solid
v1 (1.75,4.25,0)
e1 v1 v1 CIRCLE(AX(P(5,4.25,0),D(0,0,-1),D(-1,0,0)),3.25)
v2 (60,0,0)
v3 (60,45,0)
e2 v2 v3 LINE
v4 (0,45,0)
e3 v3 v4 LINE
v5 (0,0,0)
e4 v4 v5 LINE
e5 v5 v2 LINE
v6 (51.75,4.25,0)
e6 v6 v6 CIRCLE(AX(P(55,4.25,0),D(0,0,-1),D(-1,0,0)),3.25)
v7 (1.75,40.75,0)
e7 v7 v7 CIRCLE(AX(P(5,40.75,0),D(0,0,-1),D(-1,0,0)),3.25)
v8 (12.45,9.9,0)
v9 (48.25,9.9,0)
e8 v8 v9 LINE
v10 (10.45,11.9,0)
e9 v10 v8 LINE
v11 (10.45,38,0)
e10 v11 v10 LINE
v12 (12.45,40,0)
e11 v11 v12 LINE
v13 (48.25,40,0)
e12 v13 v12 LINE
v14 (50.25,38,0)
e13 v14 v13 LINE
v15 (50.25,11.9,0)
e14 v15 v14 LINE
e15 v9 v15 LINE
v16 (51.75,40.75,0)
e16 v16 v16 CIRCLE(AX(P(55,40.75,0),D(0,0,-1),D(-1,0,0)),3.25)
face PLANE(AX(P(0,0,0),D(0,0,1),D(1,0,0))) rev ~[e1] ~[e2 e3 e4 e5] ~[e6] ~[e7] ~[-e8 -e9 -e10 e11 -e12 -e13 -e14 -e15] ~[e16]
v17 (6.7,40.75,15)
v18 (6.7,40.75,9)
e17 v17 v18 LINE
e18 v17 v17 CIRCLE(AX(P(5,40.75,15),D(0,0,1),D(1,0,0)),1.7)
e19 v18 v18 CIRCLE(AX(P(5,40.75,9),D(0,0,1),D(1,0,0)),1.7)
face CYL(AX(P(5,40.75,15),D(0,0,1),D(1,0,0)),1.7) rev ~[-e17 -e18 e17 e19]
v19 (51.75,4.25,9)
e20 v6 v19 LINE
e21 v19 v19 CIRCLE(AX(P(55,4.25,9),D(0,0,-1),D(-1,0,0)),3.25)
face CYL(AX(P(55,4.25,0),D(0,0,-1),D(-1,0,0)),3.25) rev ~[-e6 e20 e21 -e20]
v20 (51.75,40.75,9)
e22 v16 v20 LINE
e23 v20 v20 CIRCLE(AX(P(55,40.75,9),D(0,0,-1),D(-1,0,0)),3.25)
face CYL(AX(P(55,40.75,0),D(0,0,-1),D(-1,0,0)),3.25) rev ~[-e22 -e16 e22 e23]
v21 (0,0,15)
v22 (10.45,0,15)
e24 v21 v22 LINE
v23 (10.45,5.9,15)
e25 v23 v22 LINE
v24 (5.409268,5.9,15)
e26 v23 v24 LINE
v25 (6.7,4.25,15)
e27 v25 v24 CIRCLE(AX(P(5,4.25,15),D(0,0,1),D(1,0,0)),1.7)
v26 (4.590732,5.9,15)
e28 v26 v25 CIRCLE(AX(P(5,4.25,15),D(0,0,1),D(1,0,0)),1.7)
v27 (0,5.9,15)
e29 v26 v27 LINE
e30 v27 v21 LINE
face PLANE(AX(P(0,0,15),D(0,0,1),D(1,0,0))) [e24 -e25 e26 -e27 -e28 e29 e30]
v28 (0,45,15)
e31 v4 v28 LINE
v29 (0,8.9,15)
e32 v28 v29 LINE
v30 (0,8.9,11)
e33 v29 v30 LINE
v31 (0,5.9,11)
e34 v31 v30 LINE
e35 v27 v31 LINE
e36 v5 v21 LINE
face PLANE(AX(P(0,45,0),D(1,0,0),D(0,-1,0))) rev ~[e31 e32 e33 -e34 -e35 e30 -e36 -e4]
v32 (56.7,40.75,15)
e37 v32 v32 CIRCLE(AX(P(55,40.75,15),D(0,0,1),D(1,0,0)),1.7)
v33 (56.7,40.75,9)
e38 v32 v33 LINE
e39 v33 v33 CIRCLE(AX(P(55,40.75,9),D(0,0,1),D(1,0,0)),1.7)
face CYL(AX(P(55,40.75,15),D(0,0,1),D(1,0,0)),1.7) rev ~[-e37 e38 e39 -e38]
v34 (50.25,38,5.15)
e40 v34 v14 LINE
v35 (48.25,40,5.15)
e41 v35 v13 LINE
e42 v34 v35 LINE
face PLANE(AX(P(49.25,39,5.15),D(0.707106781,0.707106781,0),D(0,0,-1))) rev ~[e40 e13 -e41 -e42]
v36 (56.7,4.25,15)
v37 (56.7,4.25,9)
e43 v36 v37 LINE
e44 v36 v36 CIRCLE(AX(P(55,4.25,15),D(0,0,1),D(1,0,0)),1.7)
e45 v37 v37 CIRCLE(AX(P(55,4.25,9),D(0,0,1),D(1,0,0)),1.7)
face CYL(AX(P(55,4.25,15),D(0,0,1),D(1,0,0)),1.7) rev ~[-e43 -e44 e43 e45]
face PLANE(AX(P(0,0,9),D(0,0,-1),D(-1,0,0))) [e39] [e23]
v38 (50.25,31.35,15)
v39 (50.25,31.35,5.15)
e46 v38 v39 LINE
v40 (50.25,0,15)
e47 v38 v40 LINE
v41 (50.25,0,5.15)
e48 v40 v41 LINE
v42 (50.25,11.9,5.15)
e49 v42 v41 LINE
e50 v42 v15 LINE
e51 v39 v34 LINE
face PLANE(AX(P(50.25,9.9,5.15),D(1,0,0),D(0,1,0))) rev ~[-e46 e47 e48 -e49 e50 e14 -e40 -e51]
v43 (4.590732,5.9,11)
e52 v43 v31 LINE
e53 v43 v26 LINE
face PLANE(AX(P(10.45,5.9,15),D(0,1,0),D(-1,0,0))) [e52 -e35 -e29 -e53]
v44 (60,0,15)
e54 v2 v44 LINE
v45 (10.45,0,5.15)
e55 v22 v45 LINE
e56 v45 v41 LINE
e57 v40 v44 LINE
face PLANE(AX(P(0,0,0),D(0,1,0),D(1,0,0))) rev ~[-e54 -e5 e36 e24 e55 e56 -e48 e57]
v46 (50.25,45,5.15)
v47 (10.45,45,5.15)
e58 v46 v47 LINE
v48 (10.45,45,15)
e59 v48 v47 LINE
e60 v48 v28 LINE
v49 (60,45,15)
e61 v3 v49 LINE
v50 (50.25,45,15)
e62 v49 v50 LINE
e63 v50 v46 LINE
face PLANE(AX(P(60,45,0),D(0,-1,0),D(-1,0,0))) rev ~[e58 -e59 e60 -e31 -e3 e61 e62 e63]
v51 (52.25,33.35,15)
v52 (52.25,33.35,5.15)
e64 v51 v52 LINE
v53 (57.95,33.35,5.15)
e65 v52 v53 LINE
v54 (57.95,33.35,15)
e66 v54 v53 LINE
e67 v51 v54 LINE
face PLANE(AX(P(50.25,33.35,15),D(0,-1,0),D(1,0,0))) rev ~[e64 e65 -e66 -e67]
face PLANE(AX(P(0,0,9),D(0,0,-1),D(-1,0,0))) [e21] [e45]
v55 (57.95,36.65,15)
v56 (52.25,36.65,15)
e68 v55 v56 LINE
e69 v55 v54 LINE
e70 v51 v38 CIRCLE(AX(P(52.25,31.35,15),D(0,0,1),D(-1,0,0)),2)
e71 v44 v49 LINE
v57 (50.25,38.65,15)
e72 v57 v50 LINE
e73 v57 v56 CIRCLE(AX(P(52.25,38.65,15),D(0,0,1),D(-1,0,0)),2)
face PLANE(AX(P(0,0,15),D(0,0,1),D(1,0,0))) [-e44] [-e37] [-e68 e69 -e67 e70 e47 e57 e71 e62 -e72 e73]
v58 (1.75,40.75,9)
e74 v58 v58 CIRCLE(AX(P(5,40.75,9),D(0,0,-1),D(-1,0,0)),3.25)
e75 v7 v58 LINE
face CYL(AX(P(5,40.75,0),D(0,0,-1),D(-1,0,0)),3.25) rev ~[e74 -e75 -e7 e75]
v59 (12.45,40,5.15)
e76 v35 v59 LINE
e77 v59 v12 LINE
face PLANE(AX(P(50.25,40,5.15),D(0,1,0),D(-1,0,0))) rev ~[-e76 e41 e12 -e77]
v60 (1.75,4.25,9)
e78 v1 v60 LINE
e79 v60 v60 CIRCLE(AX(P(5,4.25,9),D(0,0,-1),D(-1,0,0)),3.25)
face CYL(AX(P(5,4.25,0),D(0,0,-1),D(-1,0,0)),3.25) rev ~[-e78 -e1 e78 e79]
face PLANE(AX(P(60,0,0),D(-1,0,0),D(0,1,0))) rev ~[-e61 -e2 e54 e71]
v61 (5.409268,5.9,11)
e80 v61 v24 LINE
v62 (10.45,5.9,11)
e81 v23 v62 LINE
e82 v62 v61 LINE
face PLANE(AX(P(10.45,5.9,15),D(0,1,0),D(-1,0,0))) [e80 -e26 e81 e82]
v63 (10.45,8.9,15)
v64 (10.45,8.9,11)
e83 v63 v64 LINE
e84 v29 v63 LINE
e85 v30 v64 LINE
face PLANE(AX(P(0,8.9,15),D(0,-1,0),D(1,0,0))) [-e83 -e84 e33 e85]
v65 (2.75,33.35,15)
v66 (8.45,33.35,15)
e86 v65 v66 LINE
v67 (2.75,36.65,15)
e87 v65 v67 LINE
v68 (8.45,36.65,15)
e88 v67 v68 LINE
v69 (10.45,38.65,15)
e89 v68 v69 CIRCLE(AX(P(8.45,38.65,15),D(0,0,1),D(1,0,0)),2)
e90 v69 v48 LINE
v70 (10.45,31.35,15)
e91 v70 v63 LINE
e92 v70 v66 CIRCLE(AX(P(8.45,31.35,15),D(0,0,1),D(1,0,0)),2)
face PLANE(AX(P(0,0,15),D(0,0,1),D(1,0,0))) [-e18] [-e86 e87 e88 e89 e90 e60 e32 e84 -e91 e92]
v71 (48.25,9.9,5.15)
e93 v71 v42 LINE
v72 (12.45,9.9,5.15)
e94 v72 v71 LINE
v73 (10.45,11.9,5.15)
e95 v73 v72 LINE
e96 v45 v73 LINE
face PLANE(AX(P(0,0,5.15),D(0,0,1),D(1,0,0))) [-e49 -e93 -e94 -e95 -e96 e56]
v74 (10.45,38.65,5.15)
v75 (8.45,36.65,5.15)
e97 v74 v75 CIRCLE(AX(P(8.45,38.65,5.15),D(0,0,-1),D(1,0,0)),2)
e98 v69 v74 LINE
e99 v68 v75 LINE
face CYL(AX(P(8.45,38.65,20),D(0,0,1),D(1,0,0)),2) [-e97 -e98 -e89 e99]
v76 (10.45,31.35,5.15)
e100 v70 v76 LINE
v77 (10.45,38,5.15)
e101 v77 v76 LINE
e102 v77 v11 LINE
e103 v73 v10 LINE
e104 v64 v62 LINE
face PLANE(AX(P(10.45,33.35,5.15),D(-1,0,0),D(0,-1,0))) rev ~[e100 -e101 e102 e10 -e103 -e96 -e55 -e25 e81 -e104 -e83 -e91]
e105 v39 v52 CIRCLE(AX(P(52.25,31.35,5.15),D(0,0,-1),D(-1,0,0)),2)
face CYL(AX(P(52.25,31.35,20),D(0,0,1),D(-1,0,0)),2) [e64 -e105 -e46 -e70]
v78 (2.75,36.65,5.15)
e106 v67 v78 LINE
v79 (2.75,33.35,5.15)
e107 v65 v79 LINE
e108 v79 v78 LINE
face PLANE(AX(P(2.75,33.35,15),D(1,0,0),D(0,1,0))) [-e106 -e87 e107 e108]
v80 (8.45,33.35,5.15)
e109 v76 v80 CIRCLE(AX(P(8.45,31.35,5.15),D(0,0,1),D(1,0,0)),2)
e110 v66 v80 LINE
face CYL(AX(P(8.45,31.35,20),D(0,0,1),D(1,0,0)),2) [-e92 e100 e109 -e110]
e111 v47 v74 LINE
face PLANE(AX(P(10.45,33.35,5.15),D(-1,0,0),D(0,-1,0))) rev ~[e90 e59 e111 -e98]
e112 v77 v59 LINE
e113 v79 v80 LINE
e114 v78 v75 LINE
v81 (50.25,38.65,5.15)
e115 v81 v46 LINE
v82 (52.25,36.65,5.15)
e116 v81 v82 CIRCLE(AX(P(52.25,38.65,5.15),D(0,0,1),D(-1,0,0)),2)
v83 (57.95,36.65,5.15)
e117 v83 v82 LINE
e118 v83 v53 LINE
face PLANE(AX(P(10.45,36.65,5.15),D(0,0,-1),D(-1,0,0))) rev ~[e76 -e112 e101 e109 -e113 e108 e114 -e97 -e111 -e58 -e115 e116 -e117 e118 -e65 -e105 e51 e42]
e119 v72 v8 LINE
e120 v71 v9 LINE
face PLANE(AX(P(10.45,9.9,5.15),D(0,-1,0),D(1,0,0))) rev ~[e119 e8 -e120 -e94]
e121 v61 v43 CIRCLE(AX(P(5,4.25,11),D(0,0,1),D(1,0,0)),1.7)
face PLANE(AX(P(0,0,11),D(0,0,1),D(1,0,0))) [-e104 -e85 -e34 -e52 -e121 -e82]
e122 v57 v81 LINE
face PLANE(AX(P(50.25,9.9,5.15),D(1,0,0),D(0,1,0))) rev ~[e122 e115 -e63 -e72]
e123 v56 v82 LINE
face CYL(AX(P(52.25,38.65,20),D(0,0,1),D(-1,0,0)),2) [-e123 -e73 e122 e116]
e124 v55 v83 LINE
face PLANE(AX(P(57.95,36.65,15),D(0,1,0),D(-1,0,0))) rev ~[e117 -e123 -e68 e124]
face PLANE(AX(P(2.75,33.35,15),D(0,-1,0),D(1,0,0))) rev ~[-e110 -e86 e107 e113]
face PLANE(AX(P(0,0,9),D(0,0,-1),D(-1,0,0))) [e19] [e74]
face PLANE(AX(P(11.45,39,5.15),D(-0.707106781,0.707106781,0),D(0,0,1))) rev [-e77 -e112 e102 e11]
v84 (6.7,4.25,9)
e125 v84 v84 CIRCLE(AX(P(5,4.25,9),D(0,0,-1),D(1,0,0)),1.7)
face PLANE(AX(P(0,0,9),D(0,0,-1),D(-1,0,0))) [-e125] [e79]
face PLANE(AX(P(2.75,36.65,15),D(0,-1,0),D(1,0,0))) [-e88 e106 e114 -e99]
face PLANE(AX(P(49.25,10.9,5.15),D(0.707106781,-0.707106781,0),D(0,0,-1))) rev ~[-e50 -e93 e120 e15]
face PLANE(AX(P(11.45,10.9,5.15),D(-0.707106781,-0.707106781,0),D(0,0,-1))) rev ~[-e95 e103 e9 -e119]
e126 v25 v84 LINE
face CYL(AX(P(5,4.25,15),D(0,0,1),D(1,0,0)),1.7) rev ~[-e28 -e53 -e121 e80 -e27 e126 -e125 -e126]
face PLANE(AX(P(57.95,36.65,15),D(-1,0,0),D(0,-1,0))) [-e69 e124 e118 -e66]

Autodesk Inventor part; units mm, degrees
ref_plane "YZ Plane" through (0, 0, 0) normal (1, 0, 0) x (0, 1, 0)
ref_plane "XZ Plane" through (0, 0, 0) normal (0, 1, 0) x (-1, 0, 0)
ref_plane "XY Plane" through (0, 0, 0) normal (0, 0, 1) x (1, 0, 0)
sketch "Sketch2" plane through (0, 0, 0) normal (0, 0, 1) x (1, 0, 0)
  line L0 (0, 0) -> (60, 0)
  line L1 (60, 0) -> (60, 45)
  line L2 (60, 45) -> (0, 45)
  line L3 (0, 45) -> (0, 0)
  dimension "d0" = 60
  dimension "d1" = 45
extrude "Cover_Body" add sketch "Sketch2" along normal blind 15
sketch "Sketch4" plane through (0, 0, 15) normal (0, 0, 1) x (1, 0, 0)
  line L0 (60, 45) -> (0, 45) projected
  line L1 (0, 45) -> (0, 0) projected
  line L2 (2.75, 33.35) -> (10.45, 33.35)
  line L3 (50.25, 33.35) -> (57.95, 33.35)
  line L4 (60, 0) -> (60, 45) projected
  line L5 (0, 0) -> (60, 0) projected
  line L6 (2.75, 33.35) -> (2.75, 36.65)
  line L7 (2.75, 36.65) -> (10.45, 36.65)
  line L8 (10.45, 36.65) -> (10.45, 45)
  line L9 (57.95, 36.65) -> (57.95, 33.35)
  line L10 (57.95, 36.65) -> (50.25, 36.65)
  line L11 (50.25, 36.65) -> (50.25, 45)
  line L12 (10.45, 45) -> (50.25, 45)
  line L13 (30, 36.5125) -> (30, -47.625) construction
  line L14 (50.25, 33.35) -> (50.25, 0)
  line L15 (10.45, 33.35) -> (10.45, 0)
  line L16 (10.45, 0) -> (50.25, 0)
  line L17 (-12.9814, 35) -> (83.563, 35) construction
  dimension "d6" = 7.7
  dimension "d14" = 3.3
  dimension "d15" = 3.3
  dimension "d22" = 60
  dimension "d23" = 30
  dimension "d28" = 7.7
  dimension "d118" = 39.8
  dimension "d130" = 33.35
  dimension "d140" = 36.65
  dimension "d141" = 10
  dimension "d142" = 10.45
extrude "Servo_Intake" cut sketch "Sketch4" against normal blind 9.85 contours L11 L10 L9 L3 L14 L5 L15 L2 L6 L7 L8 L0
sketch "Sketch5" plane through (0, 0, 15) normal (0, 0, 1) x (1, 0, 0)
  line L0 (0, 5.9) -> (0, 8.9)
  line L1 (-28.5301, 7.4) -> (55.9395, 7.4) construction
  line L2 (0, 8.9) -> (10.45, 8.9)
  line L3 (10.45, 8.9) -> (10.45, 5.9)
  line L4 (10.45, 5.9) -> (0, 5.9)
  line L5 (10.45, 0) -> (10.45, 33.35) projected
  line L6 (0, 45) -> (0, 0) projected
  line L7 (0, 0) -> (10.45, 0) projected
  dimension "d97" = 3
  dimension "d137" = 5.9
  dimension "d153" = 7.4
extrude "Cable_Opening" cut sketch "Sketch5" against normal blind 4 contours L0 L2 L3 L4
sketch "Sketch6" plane through (0, 0, 15) normal (0, 0, 1) x (1, 0, 0)
  circle A0 centre (5, 40.75) radius 1.7
  circle A1 centre (55, 40.75) radius 1.7
  circle A2 centre (55, 4.25) radius 1.7
  circle A3 centre (5, 4.25) radius 1.7
  line L0 (30, 47.1) -> (30, -0.525) construction
  line L1 (-11.6375, 22.5) -> (75.675, 22.5) construction
  line L2 (60, 0) -> (60, 45) projected
  line L3 (0, 45) -> (0, 0) projected
  line L4 (10.45, 45) -> (0, 45) projected
  line L5 (0, 0) -> (60, 0) projected
  point P0 (42, 12.35)
  point P1 (0, 12.35)
  dimension "d29" = 3.4
  dimension "d30" = 3.4
  dimension "d31" = 3.4
  dimension "d32" = 3.4
  dimension "d33" = 60
  dimension "d34" = 30
  dimension "d35" = 45
  dimension "d36" = 22.5
  dimension "d37" = 50
  dimension "d38" = 25
  dimension "d39" = 36.5
  dimension "d40" = 18.25
extrude "Screw_Holes" cut sketch "Sketch6" against normal blind 36.5
sketch "Sketch16" plane through (0, 0, 0) normal (0, 0, -1) x (-1, 0, 0)
  circle A0 centre (-55, 4.25) radius 3.25
  circle A1 centre (-5, 40.75) radius 3.25
  circle A2 centre (-55, 4.25) radius 1.7 projected
  circle A3 centre (-5, 40.75) radius 1.7 projected
  circle A4 centre (-5, 4.25) radius 1.7 projected
  circle A5 centre (-5, 4.25) radius 3.25
  circle A6 centre (-55, 40.75) radius 1.7 projected
  circle A7 centre (-55, 40.75) radius 3.25
  dimension "d99" = 6.5
  dimension "d100" = 6.5
  dimension "d151" = 6.5
  dimension "d152" = 6.5
extrude "Screw_Pockets" cut sketch "Sketch16" against normal blind 9 contours A0 | A1 | A2 | A3 | A5 | A7
sketch "Sketch24" plane through (0, 0, 5.15) normal (0, 0, 1) x (1, 0, 0)
  line L0 (10.45, 9.9) -> (50.25, 9.9)
  line L1 (50.25, 9.9) -> (50.25, 40)
  line L2 (50.25, 40) -> (10.45, 40)
  line L3 (10.45, 40) -> (10.45, 9.9)
  line L4 (50.25, 0) -> (10.45, 0) projected
  line L5 (10.45, 45) -> (50.25, 45) projected
  line L6 (10.45, 0) -> (10.45, 33.35) projected
  line L7 (50.25, 33.35) -> (50.25, 0) projected
  point P0 (0, 0)
  dimension "d143" = 9.9
  dimension "d144" = 5
extrude "Cooling_Opening" cut sketch "Sketch24" against normal up to surface (5.15 mm away) contours L3 L2 L1 L0
chamfer "Chamfer1" distance 2 angle 45 4 edges at (10.45, 9.9, 2.575) (50.25, 9.9, 2.575) (50.25, 40, 2.575) (10.45, 40, 2.575)
fillet "Fillet2" radius 2 4 edges at (10.45, 36.65, 10.075) (10.45, 33.35, 10.075) (50.25, 36.65, 10.075) (50.25, 33.35, 10.075)
equation "\"d15\" = d14"
equation "\"d23\" = 0.5 * d22"
equation "\"d28\" = d6"
equation "\"d30\" = d29"
equation "\"d31\" = d29"
equation "\"d32\" = d29"
equation "\"d34\" = 0.5 * d33"
equation "\"d36\" = 0.5 * d35"
equation "\"d38\" = 0.5 * d37"
equation "\"d40\" = 0.5 * d39"
equation "\"d41\" = d39"
equation "\"d99\" = d100"
equation "\"d151\" = d100"
equation "\"d152\" = d100"
properties part number "EDMO1-1_Cover" material "PLA"
